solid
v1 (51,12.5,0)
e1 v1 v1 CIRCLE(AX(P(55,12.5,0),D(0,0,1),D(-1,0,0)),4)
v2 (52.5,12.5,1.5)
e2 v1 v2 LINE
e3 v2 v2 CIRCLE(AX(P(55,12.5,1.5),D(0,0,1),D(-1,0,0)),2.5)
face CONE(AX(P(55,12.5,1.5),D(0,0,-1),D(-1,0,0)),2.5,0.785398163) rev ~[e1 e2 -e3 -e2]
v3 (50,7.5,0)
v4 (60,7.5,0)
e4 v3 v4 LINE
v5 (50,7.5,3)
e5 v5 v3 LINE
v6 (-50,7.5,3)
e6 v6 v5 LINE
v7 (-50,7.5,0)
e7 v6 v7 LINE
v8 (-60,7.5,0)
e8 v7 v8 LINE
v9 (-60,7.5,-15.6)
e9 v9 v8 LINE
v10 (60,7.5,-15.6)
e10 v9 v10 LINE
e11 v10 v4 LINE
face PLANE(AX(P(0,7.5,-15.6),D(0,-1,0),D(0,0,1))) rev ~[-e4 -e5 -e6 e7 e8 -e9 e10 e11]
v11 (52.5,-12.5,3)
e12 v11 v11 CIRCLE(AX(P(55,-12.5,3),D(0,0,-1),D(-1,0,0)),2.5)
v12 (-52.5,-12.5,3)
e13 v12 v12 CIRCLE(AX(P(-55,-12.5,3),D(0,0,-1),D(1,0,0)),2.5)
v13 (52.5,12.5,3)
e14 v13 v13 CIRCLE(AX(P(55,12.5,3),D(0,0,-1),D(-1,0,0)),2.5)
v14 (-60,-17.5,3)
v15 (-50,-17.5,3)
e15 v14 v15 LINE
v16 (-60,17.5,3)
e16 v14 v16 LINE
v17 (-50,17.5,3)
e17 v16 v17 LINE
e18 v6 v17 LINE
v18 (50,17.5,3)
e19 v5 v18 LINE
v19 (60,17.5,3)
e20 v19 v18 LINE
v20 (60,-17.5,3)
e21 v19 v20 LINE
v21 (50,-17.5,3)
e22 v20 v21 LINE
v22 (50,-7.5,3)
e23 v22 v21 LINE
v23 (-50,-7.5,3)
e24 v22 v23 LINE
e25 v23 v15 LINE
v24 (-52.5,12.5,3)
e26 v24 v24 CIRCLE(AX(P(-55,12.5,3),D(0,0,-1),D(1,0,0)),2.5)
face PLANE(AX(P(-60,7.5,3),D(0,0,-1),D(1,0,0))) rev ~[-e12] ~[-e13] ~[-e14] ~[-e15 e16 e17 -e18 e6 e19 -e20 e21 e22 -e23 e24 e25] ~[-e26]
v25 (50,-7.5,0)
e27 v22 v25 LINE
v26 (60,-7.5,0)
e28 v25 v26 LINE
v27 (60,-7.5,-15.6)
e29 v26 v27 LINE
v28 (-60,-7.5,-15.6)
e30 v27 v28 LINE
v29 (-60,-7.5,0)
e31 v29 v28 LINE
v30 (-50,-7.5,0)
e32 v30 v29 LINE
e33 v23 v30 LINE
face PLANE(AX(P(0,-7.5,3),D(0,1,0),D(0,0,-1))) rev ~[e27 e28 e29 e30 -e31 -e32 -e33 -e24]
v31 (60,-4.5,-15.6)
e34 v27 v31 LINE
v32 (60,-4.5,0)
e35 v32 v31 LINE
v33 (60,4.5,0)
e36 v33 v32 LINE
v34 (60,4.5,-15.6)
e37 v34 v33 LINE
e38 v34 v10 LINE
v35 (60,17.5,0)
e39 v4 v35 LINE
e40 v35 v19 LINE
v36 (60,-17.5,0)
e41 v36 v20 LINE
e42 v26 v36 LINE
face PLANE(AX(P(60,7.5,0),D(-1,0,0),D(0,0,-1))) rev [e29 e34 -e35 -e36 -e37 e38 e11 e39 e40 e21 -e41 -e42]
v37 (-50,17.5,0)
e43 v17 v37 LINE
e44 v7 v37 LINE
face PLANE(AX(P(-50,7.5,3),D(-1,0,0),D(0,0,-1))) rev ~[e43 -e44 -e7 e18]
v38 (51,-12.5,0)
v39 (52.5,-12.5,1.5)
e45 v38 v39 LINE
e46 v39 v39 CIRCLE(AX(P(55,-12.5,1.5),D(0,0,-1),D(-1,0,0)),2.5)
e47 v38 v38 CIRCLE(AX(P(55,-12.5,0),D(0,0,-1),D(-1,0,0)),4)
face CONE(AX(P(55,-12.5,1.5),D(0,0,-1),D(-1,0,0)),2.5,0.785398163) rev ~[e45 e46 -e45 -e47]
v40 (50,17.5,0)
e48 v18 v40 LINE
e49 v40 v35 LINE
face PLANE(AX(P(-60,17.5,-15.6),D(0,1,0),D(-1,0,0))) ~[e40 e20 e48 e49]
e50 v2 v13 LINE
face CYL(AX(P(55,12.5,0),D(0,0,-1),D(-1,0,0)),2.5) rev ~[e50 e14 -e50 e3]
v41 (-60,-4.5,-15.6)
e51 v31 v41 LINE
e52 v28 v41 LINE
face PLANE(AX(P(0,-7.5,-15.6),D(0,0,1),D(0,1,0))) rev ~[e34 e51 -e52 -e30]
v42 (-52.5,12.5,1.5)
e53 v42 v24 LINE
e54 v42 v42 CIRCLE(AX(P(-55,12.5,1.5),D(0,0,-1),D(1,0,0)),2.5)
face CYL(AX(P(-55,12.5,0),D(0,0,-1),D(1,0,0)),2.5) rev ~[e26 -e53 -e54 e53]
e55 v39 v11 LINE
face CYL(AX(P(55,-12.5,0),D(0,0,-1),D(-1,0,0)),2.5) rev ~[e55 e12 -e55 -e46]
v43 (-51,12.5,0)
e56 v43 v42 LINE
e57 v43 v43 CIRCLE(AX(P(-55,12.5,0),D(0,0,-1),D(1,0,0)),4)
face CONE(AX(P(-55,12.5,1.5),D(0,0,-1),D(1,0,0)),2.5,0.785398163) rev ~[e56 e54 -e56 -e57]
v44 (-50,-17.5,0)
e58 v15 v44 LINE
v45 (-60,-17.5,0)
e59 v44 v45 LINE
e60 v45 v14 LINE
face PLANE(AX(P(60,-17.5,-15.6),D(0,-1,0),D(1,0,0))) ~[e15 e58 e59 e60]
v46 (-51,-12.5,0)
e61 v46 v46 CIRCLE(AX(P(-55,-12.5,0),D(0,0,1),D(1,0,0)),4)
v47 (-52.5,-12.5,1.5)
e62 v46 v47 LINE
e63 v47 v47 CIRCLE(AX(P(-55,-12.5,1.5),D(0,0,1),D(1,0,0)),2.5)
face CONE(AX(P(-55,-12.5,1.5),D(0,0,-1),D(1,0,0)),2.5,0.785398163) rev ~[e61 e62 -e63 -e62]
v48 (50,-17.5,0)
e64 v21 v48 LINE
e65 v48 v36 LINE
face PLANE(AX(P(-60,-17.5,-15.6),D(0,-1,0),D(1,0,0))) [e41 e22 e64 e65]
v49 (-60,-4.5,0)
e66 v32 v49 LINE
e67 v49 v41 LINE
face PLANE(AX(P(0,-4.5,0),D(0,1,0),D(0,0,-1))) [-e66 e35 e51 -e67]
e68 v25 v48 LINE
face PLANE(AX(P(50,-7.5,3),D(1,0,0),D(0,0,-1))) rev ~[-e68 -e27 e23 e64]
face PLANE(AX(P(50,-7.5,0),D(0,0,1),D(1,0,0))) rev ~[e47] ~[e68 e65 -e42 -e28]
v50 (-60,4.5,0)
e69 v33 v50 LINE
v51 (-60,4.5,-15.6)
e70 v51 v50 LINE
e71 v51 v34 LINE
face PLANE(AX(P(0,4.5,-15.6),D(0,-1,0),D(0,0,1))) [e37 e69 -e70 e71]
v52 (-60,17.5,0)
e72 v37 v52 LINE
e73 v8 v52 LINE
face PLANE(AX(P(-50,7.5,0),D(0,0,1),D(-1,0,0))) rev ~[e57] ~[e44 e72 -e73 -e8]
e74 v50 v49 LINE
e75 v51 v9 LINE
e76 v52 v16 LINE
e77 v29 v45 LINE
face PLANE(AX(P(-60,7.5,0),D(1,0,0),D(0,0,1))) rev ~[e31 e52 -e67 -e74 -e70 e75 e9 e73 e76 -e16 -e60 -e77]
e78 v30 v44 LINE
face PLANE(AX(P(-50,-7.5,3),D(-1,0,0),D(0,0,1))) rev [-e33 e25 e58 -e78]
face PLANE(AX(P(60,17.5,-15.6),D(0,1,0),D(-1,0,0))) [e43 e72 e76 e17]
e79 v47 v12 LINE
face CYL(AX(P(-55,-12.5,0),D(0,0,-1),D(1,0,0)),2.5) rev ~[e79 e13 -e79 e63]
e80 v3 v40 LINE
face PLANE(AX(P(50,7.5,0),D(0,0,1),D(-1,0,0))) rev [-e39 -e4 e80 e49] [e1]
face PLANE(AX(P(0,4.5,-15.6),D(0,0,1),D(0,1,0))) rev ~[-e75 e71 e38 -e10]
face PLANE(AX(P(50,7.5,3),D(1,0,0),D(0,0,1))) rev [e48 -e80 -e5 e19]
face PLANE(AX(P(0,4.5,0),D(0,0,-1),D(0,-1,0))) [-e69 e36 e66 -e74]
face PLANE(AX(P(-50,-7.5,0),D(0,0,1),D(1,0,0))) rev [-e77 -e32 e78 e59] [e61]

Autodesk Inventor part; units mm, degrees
ref_plane "YZ Plane" through (0, 0, 0) normal (1, 0, 0) x (0, 1, 0)
ref_plane "XZ Plane" through (0, 0, 0) normal (0, 1, 0) x (-1, 0, 0)
ref_plane "XY Plane" through (0, 0, 0) normal (0, 0, 1) x (1, 0, 0)
sketch "Sketch1" plane through (0, 0, 0) normal (1, 0, 0) x (0, 1, 0)
  line L0 (4.5, -15.6) -> (4.5, 0)
  line L1 (4.5, 0) -> (-4.5, 0)
  line L2 (-4.5, 0) -> (-4.5, -15.6)
  line L3 (7.5, -15.6) -> (7.5, 3)
  line L4 (7.5, 3) -> (-7.5, 3)
  line L5 (-7.5, 3) -> (-7.5, -15.6)
  line L6 (-7.5, -15.6) -> (-4.5, -15.6)
  line L7 (4.5, -15.6) -> (7.5, -15.6)
  point P0 (0, 0)
  point P1 (0, 0)
  dimension "SliderWallWidth" = 3
  dimension "d18" = 9
  dimension "d19" = 15.6
extrude "Extrusion1" add sketch "Sketch1" along normal mid plane 120
sketch "Sketch2" plane through (-60, -7.5, -15.6) normal (0, -1, 0) x (1, 0, 0)
  line L0 (120, 18.6) -> (110, 18.6)
  line L1 (110, 18.6) -> (110, 15.6)
  line L2 (110, 15.6) -> (120, 15.6)
  line L3 (120, 15.6) -> (120, 18.6)
  dimension "ScrewPlateSize" = 10
  dimension "ScrewPlateHeight" = 3
extrude "Extrusion2" add sketch "Sketch2" along normal blind 10
sketch "Sketch5" plane through (60, -7.5, 0) normal (0, 0, -1) x (-1, 0, 0)
  line L0 (10, -10) -> (0, -10) construction
  line L1 (10, 0) -> (10, -10) construction
  circle A0 centre (5, -5) radius 2.5
  point P0 (60, 7.5)
  point P1 (10, -5)
  point P2 (5, -10)
  dimension "ScrewHoleDia" = 5
extrude "Extrusion4" cut sketch "Sketch5" against normal through all
chamfer "Chamfer2" distance 1.5 angle 45 1 edges at (57.5, -12.5, 0)
mirror "Mirror2" about plane through (0, 0, 0) normal (0, 1, 0) of "Extrusion4", "Chamfer2", "Extrusion2"
mirror "Mirror3" about plane through (0, 0, 0) normal (1, 0, 0) of "Extrusion4", "Chamfer2", "Extrusion2", "Mirror2"
equation "\"d18\" = RackWidth + 2 * RackOffset"
equation "\"d19\" = RackHeight"
equation "\"d3\" = RackLength"
equation "\"d9\" = ScrewPlateSize"
equation "\"RackOffset\" = 0.5"
equation "\"RackWidth\" = 8"
equation "\"RackHeight\" = 15.6"
equation "\"RackLength\" = 120"
properties part number "RackSlider"
